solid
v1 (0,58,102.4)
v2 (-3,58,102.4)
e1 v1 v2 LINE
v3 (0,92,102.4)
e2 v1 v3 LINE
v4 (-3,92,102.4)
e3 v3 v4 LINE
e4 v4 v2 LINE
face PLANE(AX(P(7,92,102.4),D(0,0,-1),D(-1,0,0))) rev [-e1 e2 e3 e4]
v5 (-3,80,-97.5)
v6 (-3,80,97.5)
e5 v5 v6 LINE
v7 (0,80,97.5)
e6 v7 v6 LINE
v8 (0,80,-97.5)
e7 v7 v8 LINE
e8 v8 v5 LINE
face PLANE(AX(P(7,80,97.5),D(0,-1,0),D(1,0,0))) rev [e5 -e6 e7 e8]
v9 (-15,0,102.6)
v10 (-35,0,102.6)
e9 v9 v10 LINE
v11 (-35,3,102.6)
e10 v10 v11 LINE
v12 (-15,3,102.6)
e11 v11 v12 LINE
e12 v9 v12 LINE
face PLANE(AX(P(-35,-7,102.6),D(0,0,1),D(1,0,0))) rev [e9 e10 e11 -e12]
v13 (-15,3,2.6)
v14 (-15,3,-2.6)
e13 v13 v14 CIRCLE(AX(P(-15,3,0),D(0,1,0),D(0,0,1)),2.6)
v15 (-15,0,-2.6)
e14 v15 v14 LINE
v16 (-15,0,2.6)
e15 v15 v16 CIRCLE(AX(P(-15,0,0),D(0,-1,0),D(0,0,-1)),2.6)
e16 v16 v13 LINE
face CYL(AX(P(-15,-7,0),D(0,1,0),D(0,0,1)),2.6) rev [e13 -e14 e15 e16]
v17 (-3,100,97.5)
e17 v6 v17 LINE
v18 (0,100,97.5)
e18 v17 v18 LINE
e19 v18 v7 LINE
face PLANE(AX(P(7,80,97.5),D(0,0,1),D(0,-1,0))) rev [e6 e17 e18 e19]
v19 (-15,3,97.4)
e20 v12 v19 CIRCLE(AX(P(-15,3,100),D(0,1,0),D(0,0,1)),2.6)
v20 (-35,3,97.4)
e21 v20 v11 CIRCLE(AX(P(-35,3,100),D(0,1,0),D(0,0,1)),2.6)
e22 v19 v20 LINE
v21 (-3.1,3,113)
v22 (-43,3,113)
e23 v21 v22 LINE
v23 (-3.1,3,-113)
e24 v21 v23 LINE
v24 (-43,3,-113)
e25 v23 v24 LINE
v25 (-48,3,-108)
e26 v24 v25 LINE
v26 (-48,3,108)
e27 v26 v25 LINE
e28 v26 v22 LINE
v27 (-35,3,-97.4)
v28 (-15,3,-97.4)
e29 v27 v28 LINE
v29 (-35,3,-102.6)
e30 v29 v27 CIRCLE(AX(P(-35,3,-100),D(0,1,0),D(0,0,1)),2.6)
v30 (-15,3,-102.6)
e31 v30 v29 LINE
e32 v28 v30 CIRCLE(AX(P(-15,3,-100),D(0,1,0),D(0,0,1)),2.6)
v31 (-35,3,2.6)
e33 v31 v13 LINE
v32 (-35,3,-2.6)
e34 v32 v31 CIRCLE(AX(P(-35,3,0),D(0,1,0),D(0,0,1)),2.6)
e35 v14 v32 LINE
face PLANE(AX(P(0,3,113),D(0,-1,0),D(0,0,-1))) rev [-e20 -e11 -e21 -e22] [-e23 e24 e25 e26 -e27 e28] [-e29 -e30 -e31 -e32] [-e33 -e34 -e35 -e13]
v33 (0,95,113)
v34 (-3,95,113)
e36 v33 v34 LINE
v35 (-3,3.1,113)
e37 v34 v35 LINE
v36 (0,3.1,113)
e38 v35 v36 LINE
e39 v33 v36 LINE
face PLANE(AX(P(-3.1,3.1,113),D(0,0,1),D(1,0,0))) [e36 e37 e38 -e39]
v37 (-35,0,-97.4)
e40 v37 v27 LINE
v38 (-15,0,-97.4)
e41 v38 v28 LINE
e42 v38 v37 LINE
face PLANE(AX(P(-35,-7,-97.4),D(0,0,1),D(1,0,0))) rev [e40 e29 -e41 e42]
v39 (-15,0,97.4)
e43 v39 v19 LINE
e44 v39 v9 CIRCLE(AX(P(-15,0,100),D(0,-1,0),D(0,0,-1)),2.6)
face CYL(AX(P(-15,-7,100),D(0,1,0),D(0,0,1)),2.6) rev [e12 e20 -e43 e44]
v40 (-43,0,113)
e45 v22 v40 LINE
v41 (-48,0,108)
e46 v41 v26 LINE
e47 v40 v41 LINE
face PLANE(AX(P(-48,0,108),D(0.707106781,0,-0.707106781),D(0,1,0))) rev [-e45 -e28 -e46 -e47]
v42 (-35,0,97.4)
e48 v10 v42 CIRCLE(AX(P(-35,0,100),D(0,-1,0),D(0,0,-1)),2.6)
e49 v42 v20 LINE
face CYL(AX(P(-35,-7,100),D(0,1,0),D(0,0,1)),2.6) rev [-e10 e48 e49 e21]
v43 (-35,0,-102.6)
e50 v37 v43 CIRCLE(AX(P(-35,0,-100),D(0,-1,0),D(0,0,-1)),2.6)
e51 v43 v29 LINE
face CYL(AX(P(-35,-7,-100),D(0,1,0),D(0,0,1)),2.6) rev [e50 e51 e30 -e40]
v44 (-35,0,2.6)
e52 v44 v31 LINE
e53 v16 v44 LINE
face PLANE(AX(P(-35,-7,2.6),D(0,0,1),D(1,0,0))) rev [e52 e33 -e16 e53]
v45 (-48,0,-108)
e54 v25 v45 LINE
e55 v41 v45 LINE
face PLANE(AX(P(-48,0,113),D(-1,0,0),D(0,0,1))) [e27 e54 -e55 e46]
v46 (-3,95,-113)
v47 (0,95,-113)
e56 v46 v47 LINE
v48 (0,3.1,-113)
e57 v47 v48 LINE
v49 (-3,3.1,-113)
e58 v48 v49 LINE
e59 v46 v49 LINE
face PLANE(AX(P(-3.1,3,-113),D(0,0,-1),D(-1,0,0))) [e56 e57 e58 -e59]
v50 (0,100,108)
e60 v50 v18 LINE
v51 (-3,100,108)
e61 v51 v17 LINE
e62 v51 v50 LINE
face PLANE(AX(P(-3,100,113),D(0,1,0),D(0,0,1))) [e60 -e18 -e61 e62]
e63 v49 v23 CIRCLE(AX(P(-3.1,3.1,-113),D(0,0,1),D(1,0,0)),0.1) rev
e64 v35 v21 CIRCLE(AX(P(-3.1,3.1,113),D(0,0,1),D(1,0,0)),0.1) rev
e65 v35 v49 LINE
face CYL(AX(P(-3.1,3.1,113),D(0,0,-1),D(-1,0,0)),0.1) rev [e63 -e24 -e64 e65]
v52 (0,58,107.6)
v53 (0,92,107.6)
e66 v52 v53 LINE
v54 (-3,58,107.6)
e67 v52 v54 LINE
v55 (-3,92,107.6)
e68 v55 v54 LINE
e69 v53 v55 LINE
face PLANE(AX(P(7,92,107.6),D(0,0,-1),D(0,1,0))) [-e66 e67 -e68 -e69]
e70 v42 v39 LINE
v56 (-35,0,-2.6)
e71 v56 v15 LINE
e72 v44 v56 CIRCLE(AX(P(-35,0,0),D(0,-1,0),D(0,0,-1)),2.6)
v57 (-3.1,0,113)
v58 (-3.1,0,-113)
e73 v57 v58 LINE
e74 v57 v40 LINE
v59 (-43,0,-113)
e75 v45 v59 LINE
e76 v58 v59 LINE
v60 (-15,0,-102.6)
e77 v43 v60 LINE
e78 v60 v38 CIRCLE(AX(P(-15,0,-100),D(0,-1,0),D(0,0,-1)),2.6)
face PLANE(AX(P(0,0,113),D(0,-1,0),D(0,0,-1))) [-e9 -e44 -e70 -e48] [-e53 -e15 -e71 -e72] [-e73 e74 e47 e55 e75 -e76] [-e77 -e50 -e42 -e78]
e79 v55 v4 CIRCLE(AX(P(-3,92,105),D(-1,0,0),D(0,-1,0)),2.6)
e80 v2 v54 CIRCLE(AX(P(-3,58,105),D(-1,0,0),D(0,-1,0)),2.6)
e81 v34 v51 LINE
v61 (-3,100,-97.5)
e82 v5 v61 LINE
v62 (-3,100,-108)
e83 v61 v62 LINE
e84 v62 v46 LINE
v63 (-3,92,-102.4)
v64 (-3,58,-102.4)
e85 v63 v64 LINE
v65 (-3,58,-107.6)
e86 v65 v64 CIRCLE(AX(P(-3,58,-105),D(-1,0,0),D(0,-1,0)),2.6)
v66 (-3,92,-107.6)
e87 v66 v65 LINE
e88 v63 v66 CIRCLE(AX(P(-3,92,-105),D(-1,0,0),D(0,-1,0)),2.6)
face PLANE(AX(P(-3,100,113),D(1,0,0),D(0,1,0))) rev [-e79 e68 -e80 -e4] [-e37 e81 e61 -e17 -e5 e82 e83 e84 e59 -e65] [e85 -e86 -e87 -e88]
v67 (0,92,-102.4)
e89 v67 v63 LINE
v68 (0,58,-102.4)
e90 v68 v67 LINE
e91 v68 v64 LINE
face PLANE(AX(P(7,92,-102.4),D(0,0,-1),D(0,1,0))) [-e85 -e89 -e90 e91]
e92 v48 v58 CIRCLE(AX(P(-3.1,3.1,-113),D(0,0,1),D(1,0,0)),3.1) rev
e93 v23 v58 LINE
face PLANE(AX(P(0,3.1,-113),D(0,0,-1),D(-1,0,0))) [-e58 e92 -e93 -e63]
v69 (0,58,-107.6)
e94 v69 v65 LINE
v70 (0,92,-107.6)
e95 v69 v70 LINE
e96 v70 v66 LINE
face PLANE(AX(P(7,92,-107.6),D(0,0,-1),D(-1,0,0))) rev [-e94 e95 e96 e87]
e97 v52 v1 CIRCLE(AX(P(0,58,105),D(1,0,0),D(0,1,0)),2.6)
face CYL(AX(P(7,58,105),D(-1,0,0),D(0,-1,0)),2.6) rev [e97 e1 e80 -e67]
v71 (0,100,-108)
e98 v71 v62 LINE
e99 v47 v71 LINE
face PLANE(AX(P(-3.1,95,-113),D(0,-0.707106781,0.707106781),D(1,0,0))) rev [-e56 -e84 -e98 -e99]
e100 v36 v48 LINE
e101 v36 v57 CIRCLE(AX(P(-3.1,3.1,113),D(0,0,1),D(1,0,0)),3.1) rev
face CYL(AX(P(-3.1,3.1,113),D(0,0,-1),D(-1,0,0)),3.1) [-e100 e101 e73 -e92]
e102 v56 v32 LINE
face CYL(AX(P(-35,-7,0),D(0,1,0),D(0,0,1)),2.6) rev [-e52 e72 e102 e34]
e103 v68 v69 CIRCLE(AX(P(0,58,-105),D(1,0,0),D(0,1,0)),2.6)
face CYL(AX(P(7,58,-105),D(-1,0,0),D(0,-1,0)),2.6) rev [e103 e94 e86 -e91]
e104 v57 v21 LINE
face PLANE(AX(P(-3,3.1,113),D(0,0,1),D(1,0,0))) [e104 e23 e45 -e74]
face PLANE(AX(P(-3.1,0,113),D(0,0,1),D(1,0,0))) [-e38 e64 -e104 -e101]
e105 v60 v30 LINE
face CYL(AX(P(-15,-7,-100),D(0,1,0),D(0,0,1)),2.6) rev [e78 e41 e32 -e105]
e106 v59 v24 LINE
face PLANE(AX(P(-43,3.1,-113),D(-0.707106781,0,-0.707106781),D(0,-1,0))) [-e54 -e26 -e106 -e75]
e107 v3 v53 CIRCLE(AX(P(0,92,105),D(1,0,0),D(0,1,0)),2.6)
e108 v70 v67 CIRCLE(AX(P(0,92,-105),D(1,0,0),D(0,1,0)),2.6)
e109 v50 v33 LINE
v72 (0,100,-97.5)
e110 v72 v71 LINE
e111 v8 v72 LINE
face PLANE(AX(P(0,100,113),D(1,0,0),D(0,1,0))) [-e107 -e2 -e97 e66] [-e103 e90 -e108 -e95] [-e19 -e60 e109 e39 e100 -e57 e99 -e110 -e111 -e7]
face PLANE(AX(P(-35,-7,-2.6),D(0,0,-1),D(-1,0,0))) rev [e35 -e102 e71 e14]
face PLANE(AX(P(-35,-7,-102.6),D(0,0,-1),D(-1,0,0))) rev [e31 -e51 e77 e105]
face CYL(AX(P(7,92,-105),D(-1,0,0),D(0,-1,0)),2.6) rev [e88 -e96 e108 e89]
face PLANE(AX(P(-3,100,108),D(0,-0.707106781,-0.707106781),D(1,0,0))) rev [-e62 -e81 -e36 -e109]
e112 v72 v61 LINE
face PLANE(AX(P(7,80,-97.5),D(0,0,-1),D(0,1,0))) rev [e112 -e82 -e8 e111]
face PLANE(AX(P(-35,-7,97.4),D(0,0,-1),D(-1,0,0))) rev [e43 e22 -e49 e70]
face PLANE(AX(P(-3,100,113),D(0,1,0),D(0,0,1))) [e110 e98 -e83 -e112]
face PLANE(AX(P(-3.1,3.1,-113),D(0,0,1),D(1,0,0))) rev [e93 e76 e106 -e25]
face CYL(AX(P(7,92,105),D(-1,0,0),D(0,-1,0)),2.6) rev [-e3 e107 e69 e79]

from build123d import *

# Parameters (mm, degrees)
SM_BASE_FLANGE_1_DEPTH = 113
CUT_EXTRUDE_1_DEPTH    = 10
CUT_EXTRUDE_2_DEPTH    = 10
CHAMFER_1_SIZE         = 5
SKETCH_8_W             = 195
SKETCH_8_H             = 40
CUT_EXTRUDE_3_DEPTH    = 10


# Sheet-metal steps are written as plain solids
with BuildPart() as part:
    # Sketch 1 → 基体-法兰1 (new, symmetric)
    with BuildSketch(Plane.XY):
        with BuildLine():
            Line((0, 100), (0, 3.1))
            ThreePointArc((0, 3.1), (-0.907968978, 0.907968978), (-3.1, 0))
            Line((-3.1, 0), (-48, 0))
            Line((-48, 0), (-48, 3))
            Line((-48, 3), (-3.1, 3))
            ThreePointArc((-3.1, 3), (-3.029289322, 3.029289322), (-3, 3.1))
            Line((-3, 3.1), (-3, 100))
            Line((-3, 100), (0, 100))
        make_face()
    extrude(amount=SM_BASE_FLANGE_1_DEPTH, both=True)

    # 草图6 → 切除-拉伸1 (cut)
    with BuildSketch(Plane.ZY.offset(3)):
        with BuildLine():
            Line((-102.4, 92), (-102.4, 58))
            ThreePointArc((-102.4, 58), (-105, 55.4), (-107.6, 58))
            Line((-107.6, 58), (-107.6, 92))
            ThreePointArc((-107.6, 92), (-105, 94.6), (-102.4, 92))
        make_face()
        with BuildLine():
            Line((107.6, 92), (107.6, 58))
            ThreePointArc((107.6, 58), (105, 55.4), (102.4, 58))
            Line((102.4, 58), (102.4, 92))
            ThreePointArc((102.4, 92), (105, 94.6), (107.6, 92))
        make_face()
    extrude(amount=-CUT_EXTRUDE_1_DEPTH, mode=Mode.SUBTRACT)

    # 草图7 → 切除-拉伸2 (cut)
    with BuildSketch(Plane(origin=(0, 3, 0), x_dir=(1, 0, 0), z_dir=(0, 1, 0))):
        with BuildLine():
            Line((-35, 102.6), (-15, 102.6))
            ThreePointArc((-15, 102.6), (-12.4, 100), (-15, 97.4))
            Line((-15, 97.4), (-35, 97.4))
            ThreePointArc((-35, 97.4), (-37.6, 100), (-35, 102.6))
        make_face()
        with BuildLine():
            Line((-35, 2.6), (-15, 2.6))
            ThreePointArc((-15, 2.6), (-12.4, 0), (-15, -2.6))
            Line((-15, -2.6), (-35, -2.6))
            ThreePointArc((-35, -2.6), (-37.6, 0), (-35, 2.6))
        make_face()
        with BuildLine():
            Line((-35, -97.4), (-15, -97.4))
            ThreePointArc((-15, -97.4), (-12.4, -100), (-15, -102.6))
            Line((-15, -102.6), (-35, -102.6))
            ThreePointArc((-35, -102.6), (-37.6, -100), (-35, -97.4))
        make_face()
    extrude(amount=-CUT_EXTRUDE_2_DEPTH, mode=Mode.SUBTRACT)

    # 倒角1
    chamfer_1_edges = [part.edges().sort_by_distance(p)[0] for p in [
        (-1.5, 100, 113),
        (-48, 1.5, 113),
        (-1.5, 100, -113),
        (-48, 1.5, -113),
    ]]
    chamfer(chamfer_1_edges, length=CHAMFER_1_SIZE)

    # 草图8 → 切除-拉伸3 (cut)
    with BuildSketch(Plane.ZY.offset(3)):
        with Locations((0, 100)):
            Rectangle(SKETCH_8_W, SKETCH_8_H)
    extrude(amount=-CUT_EXTRUDE_3_DEPTH, mode=Mode.SUBTRACT)


solid = part.part
